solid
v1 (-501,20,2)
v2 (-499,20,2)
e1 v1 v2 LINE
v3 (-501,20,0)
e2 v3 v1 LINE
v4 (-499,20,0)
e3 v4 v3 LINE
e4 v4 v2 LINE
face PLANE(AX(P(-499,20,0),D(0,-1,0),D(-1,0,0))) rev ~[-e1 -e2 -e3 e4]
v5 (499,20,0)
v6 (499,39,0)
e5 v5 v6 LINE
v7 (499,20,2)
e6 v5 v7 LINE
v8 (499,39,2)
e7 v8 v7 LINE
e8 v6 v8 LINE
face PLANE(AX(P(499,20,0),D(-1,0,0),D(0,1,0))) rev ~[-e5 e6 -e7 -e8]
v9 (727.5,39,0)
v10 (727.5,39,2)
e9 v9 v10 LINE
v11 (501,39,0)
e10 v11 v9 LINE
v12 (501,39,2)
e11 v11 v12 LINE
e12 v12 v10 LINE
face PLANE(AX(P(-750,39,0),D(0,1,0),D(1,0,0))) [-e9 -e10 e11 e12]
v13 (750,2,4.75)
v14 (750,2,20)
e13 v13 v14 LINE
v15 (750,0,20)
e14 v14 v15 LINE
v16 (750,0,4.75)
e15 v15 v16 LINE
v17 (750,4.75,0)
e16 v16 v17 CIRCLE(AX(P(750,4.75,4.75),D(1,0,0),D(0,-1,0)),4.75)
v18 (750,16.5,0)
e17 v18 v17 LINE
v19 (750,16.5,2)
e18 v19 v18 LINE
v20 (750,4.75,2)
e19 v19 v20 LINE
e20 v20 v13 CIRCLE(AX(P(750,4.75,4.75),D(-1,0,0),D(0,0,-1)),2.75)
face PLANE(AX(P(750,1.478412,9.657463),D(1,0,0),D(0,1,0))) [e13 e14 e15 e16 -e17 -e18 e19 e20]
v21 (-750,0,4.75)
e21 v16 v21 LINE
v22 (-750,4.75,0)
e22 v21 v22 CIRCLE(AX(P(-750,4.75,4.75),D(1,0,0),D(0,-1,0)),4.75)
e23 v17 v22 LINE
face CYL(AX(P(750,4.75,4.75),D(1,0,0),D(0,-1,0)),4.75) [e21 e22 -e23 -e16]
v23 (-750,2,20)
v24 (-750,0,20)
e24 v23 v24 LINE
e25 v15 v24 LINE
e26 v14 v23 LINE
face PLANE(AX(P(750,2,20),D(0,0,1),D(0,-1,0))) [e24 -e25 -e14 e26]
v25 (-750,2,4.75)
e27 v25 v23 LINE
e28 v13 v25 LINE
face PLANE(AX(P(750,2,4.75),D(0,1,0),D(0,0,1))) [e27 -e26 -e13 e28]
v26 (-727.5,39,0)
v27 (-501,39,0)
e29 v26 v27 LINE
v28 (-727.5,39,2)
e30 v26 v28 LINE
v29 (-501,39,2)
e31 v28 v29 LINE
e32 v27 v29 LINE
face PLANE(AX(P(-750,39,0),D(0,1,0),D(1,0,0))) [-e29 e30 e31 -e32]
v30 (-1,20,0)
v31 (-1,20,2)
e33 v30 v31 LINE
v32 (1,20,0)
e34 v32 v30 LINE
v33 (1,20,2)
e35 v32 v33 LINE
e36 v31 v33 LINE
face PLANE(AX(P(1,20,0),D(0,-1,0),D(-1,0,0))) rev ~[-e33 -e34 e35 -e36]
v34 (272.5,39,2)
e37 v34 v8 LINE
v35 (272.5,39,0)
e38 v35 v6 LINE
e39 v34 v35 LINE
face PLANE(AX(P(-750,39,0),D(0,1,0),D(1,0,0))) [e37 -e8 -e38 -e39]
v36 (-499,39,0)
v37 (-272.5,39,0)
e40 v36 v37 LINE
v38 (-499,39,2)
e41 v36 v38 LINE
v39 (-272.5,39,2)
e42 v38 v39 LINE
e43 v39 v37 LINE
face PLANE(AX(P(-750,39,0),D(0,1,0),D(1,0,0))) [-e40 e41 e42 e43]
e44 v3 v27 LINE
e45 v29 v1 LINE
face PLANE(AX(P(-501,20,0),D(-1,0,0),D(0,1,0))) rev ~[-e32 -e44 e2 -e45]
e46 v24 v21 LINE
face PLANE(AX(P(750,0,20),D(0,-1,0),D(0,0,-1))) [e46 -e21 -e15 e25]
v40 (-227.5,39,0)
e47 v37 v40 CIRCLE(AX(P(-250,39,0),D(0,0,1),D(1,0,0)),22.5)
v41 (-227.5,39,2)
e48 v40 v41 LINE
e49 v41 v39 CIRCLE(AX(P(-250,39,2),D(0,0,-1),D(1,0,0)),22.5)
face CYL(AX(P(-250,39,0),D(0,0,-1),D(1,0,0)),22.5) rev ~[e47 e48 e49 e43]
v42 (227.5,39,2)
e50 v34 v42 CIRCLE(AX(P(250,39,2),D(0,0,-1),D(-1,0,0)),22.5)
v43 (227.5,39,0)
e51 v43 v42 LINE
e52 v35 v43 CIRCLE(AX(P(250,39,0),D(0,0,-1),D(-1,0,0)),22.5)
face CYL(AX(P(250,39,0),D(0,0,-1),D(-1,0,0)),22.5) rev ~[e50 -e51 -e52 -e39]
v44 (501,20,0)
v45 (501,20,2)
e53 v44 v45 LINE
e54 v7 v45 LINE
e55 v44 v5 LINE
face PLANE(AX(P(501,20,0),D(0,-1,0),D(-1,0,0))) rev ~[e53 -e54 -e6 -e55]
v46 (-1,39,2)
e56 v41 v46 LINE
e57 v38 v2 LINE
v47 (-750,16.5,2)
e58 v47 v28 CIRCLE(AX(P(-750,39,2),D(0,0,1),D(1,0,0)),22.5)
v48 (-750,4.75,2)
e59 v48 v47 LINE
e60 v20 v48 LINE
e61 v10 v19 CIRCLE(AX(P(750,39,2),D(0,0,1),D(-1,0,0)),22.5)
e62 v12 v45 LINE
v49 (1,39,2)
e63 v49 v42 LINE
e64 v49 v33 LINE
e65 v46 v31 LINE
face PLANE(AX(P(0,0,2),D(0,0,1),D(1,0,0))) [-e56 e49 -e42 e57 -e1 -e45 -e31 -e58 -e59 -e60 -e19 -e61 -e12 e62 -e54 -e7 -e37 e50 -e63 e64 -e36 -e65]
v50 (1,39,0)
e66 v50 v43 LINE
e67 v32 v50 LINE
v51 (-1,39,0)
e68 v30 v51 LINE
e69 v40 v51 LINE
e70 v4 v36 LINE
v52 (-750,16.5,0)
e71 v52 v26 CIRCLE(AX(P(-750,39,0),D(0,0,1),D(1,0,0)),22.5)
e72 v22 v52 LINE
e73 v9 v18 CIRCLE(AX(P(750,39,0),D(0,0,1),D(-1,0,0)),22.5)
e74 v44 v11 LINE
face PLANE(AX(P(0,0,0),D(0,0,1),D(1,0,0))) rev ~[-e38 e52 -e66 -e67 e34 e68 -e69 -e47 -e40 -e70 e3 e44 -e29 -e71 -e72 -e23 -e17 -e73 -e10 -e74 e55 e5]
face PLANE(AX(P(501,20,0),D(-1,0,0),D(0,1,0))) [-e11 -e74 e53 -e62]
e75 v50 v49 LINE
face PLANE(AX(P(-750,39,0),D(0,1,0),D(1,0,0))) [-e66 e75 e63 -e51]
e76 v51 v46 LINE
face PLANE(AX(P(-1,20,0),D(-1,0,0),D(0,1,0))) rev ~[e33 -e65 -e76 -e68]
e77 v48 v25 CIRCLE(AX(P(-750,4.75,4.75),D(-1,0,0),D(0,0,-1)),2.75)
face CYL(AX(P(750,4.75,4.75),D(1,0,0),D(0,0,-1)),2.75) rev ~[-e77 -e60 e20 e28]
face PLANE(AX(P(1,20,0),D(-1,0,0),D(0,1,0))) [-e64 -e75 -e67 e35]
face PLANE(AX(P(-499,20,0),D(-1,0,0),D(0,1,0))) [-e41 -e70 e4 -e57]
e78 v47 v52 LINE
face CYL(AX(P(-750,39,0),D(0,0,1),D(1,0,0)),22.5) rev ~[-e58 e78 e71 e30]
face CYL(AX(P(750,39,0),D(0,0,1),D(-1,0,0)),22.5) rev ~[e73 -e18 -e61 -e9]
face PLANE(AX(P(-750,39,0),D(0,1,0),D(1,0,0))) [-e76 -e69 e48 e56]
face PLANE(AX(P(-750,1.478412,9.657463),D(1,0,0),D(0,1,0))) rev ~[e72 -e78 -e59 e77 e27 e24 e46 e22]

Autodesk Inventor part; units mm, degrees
ref_plane "YZ Plane" through (0, 0, 0) normal (1, 0, 0) x (0, 1, 0)
ref_plane "XZ Plane" through (0, 0, 0) normal (0, 1, 0) x (-1, 0, 0)
ref_plane "XY Plane" through (0, 0, 0) normal (0, 0, 1) x (1, 0, 0)
sketch "Sketch1" plane through (0, 0, 0) normal (0, 0, 1) x (1, 0, 0)
  line L0 (-750, 39) -> (750, 39)
  line L1 (750, 39) -> (750, 0)
  line L2 (750, 0) -> (-750, 0)
  line L3 (-750, 0) -> (-750, 39)
  point P0 (0, 0)
  point P1 (0, 0)
  dimension "d0" = 1500
  dimension "d1" = 39
extrude "Plate1" add sketch "Sketch1" along normal blind 2
sketch "Sketch2" plane through (750, 2, 0) normal (0, -1, 0) x (1, 0, 0)
  line L0 (-1500, 0) -> (0, 0)
  line L1 (0, 0) -> (0, 20)
  line L2 (0, 20) -> (-1500, 20)
  line L3 (-1500, 20) -> (-1500, 0)
edge flange "Flange1" height 20 angle 90 thickness 2 bend radius 2.75 thickness toward (0, -1, 0) relief round relief width 2 relief depth 1 edges at (0, 0, 2) wall of the first edge with corners at (-750, 2, 0) (750, 2, 0) (750, 2, 20) (-750, 2, 20)
bend "Bend1"
corner "Corner1"
sketch "Sketch5" plane through (0, 0, 0) normal (0, 0, -1) x (-1, 0, 0)
  line L0 (750, 39) -> (-750, 39) projected
  line L1 (-1, 20) -> (-1, 39)
  line L2 (750, 0) -> (-750, 0) projected
  line L3 (-1, 20) -> (1, 20)
  line L4 (1, 20) -> (1, 39)
  point P0 (0, 0)
  point P1 (0, 20)
  point P2 (0, 0)
  dimension "d27" = 2
  dimension "d28" = 20
extrude "Extrusion1" cut sketch "Sketch5" against normal through all
pattern_linear "Rectangular Pattern1" count 3 spacing 500 along (1, 0, 0) of "Extrusion1" first direction both ways yes
sketch "Sketch6" plane through (0, 0, 0) normal (0, 0, -1) x (-1, 0, 0)
  line L0 (-750, 39) -> (-750, 4.75) projected
  circle A0 centre (-750, 39) radius 22.5
  line L1 (-750, 39) -> (750, 39) projected
  line L2 (-1, 39) -> (-1, 20) projected
  line L3 (-499, 39) -> (-499, 20) projected
  line L4 (-1, 20) -> (-499, 20) construction
  circle A1 centre (-250, 39) radius 22.5
  point P0 (0, 0)
  point P1 (-727.5, 39)
  point P2 (-750, 16.5)
  point P3 (-250, 20)
  dimension "d24" = 45
extrude "Extrusion2" cut sketch "Sketch6" along normal mid plane 30 contours L1 A0 L0 | A1 L1 | L1 A1 picked at (-748.3311, 24.188)
mirror "Mirror1" about plane through (0, 0, 0) normal (1, 0, 0) of "Extrusion2"
sketch "Sketch7" plane through (0, 0, 2) normal (0, 0, 1) x (1, 0, 0)
  arc A0 (-750, 16.5) -> (-727.5, 39) centre (-750, 39) ccw projected
  line L0 (-750, 4.75) -> (-750, 16.5) projected
  line L1 (-750, 4.75) -> (750, 4.75) projected
  line L2 (750, 16.5) -> (750, 4.75) projected
  arc A1 (727.5, 39) -> (750, 16.5) centre (750, 39) ccw projected
  line L3 (501, 39) -> (727.5, 39) projected
  line L4 (501, 39) -> (501, 20) projected
  line L5 (501, 20) -> (499, 20) projected
  line L6 (499, 20) -> (499, 39) projected
  line L7 (1, 39) -> (227.5, 39) projected
  line L8 (1, 39) -> (1, 20) projected
  line L9 (1, 20) -> (-1, 20) projected
  line L10 (-1, 20) -> (-1, 39) projected
  line L11 (-499, 39) -> (-272.5, 39) projected
  line L12 (-499, 39) -> (-499, 20) projected
  line L13 (-499, 20) -> (-501, 20) projected
  line L14 (-501, 20) -> (-501, 39) projected
  line L15 (-727.5, 39) -> (-501, 39) projected
  line L16 (650, 4.75) -> (650, 39) construction
  line L17 (-750, 4.75) -> (750, 4.75) projected
  circle A2 centre (650, 21.875) radius 5
  circle A3 centre (630, 21.875) radius 5
  line L18 (272.5, 39) -> (499, 39) projected
  arc A4 (227.5, 39) -> (272.5, 39) centre (250, 39) ccw projected
  line L19 (-227.5, 39) -> (-1, 39) projected
  arc A5 (-272.5, 39) -> (-227.5, 39) centre (-250, 39) ccw projected
  point P0 (0, 0)
  dimension "d29" = 100
  dimension "d30" = 10
  dimension "d31" = 10
  dimension "d32" = 20
extrude "Extrusion3" [suppressed]
mirror "Mirror2" [suppressed]
sketch "Sketch8" plane through (0, 0, 2) normal (0, 0, 1) x (1, 0, 0)
  line L0 (494, 34) -> (494, 22) construction
  line L1 (494, 22) -> (294, 22) construction
  line L2 (294, 22) -> (294, 34) construction
  line L3 (294, 34) -> (494, 34) construction
  line L4 (501, 39) -> (727.5, 39) projected
  line L5 (272.5, 39) -> (499, 39) projected
  point P0 (0, 0)
  dimension "d35" = 200
  dimension "d36" = 12
  dimension "d39" = 5
  dimension "d40" = 5
mark "Mark1"
equation "\"d28\" = РЕБРА_полка"
equation "\"d1\" = БОРТ_стрингер_4_высота"
equation "\"d27\" = d18"
equation "\"d2\" = Thickness"
equation "\"d3\" = BendReliefWidth"
equation "\"d4\" = BendReliefDepth"
equation "\"d5\" = MinimumRemnant"
equation "\"d6\" = TransitionRadius"
equation "\"d9\" = BendRadius"
equation "\"d10\" = CornerReliefSize"
equation "\"d11\" = GapSize"
equation "\"d12\" = JacobiRadiusSize"
equation "\"BendReliefWidth\" = Thickness"
equation "\"BendReliefDepth\" = 0.5 * Thickness"
equation "\"CornerReliefSize\" = 4 * Thickness"
equation "\"MinimumRemnant\" = 2 * Thickness"
equation "\"TransitionRadius\" = BendRadius"
equation "\"JacobiRadiusSize\" = BendRadius"
equation "\"GapSize\" = Thickness"
equation "\"d18\" = Thickness"
equation "\"БОРТ_стрингер_4_высота\" = 39"
equation "\"Thickness\" = 2"
equation "\"BendRadius\" = 2.75"
equation "\"РЕБРА_полка\" = 20"
properties part number "MSC 317 stringer board ##" material "Stainless Steel"
